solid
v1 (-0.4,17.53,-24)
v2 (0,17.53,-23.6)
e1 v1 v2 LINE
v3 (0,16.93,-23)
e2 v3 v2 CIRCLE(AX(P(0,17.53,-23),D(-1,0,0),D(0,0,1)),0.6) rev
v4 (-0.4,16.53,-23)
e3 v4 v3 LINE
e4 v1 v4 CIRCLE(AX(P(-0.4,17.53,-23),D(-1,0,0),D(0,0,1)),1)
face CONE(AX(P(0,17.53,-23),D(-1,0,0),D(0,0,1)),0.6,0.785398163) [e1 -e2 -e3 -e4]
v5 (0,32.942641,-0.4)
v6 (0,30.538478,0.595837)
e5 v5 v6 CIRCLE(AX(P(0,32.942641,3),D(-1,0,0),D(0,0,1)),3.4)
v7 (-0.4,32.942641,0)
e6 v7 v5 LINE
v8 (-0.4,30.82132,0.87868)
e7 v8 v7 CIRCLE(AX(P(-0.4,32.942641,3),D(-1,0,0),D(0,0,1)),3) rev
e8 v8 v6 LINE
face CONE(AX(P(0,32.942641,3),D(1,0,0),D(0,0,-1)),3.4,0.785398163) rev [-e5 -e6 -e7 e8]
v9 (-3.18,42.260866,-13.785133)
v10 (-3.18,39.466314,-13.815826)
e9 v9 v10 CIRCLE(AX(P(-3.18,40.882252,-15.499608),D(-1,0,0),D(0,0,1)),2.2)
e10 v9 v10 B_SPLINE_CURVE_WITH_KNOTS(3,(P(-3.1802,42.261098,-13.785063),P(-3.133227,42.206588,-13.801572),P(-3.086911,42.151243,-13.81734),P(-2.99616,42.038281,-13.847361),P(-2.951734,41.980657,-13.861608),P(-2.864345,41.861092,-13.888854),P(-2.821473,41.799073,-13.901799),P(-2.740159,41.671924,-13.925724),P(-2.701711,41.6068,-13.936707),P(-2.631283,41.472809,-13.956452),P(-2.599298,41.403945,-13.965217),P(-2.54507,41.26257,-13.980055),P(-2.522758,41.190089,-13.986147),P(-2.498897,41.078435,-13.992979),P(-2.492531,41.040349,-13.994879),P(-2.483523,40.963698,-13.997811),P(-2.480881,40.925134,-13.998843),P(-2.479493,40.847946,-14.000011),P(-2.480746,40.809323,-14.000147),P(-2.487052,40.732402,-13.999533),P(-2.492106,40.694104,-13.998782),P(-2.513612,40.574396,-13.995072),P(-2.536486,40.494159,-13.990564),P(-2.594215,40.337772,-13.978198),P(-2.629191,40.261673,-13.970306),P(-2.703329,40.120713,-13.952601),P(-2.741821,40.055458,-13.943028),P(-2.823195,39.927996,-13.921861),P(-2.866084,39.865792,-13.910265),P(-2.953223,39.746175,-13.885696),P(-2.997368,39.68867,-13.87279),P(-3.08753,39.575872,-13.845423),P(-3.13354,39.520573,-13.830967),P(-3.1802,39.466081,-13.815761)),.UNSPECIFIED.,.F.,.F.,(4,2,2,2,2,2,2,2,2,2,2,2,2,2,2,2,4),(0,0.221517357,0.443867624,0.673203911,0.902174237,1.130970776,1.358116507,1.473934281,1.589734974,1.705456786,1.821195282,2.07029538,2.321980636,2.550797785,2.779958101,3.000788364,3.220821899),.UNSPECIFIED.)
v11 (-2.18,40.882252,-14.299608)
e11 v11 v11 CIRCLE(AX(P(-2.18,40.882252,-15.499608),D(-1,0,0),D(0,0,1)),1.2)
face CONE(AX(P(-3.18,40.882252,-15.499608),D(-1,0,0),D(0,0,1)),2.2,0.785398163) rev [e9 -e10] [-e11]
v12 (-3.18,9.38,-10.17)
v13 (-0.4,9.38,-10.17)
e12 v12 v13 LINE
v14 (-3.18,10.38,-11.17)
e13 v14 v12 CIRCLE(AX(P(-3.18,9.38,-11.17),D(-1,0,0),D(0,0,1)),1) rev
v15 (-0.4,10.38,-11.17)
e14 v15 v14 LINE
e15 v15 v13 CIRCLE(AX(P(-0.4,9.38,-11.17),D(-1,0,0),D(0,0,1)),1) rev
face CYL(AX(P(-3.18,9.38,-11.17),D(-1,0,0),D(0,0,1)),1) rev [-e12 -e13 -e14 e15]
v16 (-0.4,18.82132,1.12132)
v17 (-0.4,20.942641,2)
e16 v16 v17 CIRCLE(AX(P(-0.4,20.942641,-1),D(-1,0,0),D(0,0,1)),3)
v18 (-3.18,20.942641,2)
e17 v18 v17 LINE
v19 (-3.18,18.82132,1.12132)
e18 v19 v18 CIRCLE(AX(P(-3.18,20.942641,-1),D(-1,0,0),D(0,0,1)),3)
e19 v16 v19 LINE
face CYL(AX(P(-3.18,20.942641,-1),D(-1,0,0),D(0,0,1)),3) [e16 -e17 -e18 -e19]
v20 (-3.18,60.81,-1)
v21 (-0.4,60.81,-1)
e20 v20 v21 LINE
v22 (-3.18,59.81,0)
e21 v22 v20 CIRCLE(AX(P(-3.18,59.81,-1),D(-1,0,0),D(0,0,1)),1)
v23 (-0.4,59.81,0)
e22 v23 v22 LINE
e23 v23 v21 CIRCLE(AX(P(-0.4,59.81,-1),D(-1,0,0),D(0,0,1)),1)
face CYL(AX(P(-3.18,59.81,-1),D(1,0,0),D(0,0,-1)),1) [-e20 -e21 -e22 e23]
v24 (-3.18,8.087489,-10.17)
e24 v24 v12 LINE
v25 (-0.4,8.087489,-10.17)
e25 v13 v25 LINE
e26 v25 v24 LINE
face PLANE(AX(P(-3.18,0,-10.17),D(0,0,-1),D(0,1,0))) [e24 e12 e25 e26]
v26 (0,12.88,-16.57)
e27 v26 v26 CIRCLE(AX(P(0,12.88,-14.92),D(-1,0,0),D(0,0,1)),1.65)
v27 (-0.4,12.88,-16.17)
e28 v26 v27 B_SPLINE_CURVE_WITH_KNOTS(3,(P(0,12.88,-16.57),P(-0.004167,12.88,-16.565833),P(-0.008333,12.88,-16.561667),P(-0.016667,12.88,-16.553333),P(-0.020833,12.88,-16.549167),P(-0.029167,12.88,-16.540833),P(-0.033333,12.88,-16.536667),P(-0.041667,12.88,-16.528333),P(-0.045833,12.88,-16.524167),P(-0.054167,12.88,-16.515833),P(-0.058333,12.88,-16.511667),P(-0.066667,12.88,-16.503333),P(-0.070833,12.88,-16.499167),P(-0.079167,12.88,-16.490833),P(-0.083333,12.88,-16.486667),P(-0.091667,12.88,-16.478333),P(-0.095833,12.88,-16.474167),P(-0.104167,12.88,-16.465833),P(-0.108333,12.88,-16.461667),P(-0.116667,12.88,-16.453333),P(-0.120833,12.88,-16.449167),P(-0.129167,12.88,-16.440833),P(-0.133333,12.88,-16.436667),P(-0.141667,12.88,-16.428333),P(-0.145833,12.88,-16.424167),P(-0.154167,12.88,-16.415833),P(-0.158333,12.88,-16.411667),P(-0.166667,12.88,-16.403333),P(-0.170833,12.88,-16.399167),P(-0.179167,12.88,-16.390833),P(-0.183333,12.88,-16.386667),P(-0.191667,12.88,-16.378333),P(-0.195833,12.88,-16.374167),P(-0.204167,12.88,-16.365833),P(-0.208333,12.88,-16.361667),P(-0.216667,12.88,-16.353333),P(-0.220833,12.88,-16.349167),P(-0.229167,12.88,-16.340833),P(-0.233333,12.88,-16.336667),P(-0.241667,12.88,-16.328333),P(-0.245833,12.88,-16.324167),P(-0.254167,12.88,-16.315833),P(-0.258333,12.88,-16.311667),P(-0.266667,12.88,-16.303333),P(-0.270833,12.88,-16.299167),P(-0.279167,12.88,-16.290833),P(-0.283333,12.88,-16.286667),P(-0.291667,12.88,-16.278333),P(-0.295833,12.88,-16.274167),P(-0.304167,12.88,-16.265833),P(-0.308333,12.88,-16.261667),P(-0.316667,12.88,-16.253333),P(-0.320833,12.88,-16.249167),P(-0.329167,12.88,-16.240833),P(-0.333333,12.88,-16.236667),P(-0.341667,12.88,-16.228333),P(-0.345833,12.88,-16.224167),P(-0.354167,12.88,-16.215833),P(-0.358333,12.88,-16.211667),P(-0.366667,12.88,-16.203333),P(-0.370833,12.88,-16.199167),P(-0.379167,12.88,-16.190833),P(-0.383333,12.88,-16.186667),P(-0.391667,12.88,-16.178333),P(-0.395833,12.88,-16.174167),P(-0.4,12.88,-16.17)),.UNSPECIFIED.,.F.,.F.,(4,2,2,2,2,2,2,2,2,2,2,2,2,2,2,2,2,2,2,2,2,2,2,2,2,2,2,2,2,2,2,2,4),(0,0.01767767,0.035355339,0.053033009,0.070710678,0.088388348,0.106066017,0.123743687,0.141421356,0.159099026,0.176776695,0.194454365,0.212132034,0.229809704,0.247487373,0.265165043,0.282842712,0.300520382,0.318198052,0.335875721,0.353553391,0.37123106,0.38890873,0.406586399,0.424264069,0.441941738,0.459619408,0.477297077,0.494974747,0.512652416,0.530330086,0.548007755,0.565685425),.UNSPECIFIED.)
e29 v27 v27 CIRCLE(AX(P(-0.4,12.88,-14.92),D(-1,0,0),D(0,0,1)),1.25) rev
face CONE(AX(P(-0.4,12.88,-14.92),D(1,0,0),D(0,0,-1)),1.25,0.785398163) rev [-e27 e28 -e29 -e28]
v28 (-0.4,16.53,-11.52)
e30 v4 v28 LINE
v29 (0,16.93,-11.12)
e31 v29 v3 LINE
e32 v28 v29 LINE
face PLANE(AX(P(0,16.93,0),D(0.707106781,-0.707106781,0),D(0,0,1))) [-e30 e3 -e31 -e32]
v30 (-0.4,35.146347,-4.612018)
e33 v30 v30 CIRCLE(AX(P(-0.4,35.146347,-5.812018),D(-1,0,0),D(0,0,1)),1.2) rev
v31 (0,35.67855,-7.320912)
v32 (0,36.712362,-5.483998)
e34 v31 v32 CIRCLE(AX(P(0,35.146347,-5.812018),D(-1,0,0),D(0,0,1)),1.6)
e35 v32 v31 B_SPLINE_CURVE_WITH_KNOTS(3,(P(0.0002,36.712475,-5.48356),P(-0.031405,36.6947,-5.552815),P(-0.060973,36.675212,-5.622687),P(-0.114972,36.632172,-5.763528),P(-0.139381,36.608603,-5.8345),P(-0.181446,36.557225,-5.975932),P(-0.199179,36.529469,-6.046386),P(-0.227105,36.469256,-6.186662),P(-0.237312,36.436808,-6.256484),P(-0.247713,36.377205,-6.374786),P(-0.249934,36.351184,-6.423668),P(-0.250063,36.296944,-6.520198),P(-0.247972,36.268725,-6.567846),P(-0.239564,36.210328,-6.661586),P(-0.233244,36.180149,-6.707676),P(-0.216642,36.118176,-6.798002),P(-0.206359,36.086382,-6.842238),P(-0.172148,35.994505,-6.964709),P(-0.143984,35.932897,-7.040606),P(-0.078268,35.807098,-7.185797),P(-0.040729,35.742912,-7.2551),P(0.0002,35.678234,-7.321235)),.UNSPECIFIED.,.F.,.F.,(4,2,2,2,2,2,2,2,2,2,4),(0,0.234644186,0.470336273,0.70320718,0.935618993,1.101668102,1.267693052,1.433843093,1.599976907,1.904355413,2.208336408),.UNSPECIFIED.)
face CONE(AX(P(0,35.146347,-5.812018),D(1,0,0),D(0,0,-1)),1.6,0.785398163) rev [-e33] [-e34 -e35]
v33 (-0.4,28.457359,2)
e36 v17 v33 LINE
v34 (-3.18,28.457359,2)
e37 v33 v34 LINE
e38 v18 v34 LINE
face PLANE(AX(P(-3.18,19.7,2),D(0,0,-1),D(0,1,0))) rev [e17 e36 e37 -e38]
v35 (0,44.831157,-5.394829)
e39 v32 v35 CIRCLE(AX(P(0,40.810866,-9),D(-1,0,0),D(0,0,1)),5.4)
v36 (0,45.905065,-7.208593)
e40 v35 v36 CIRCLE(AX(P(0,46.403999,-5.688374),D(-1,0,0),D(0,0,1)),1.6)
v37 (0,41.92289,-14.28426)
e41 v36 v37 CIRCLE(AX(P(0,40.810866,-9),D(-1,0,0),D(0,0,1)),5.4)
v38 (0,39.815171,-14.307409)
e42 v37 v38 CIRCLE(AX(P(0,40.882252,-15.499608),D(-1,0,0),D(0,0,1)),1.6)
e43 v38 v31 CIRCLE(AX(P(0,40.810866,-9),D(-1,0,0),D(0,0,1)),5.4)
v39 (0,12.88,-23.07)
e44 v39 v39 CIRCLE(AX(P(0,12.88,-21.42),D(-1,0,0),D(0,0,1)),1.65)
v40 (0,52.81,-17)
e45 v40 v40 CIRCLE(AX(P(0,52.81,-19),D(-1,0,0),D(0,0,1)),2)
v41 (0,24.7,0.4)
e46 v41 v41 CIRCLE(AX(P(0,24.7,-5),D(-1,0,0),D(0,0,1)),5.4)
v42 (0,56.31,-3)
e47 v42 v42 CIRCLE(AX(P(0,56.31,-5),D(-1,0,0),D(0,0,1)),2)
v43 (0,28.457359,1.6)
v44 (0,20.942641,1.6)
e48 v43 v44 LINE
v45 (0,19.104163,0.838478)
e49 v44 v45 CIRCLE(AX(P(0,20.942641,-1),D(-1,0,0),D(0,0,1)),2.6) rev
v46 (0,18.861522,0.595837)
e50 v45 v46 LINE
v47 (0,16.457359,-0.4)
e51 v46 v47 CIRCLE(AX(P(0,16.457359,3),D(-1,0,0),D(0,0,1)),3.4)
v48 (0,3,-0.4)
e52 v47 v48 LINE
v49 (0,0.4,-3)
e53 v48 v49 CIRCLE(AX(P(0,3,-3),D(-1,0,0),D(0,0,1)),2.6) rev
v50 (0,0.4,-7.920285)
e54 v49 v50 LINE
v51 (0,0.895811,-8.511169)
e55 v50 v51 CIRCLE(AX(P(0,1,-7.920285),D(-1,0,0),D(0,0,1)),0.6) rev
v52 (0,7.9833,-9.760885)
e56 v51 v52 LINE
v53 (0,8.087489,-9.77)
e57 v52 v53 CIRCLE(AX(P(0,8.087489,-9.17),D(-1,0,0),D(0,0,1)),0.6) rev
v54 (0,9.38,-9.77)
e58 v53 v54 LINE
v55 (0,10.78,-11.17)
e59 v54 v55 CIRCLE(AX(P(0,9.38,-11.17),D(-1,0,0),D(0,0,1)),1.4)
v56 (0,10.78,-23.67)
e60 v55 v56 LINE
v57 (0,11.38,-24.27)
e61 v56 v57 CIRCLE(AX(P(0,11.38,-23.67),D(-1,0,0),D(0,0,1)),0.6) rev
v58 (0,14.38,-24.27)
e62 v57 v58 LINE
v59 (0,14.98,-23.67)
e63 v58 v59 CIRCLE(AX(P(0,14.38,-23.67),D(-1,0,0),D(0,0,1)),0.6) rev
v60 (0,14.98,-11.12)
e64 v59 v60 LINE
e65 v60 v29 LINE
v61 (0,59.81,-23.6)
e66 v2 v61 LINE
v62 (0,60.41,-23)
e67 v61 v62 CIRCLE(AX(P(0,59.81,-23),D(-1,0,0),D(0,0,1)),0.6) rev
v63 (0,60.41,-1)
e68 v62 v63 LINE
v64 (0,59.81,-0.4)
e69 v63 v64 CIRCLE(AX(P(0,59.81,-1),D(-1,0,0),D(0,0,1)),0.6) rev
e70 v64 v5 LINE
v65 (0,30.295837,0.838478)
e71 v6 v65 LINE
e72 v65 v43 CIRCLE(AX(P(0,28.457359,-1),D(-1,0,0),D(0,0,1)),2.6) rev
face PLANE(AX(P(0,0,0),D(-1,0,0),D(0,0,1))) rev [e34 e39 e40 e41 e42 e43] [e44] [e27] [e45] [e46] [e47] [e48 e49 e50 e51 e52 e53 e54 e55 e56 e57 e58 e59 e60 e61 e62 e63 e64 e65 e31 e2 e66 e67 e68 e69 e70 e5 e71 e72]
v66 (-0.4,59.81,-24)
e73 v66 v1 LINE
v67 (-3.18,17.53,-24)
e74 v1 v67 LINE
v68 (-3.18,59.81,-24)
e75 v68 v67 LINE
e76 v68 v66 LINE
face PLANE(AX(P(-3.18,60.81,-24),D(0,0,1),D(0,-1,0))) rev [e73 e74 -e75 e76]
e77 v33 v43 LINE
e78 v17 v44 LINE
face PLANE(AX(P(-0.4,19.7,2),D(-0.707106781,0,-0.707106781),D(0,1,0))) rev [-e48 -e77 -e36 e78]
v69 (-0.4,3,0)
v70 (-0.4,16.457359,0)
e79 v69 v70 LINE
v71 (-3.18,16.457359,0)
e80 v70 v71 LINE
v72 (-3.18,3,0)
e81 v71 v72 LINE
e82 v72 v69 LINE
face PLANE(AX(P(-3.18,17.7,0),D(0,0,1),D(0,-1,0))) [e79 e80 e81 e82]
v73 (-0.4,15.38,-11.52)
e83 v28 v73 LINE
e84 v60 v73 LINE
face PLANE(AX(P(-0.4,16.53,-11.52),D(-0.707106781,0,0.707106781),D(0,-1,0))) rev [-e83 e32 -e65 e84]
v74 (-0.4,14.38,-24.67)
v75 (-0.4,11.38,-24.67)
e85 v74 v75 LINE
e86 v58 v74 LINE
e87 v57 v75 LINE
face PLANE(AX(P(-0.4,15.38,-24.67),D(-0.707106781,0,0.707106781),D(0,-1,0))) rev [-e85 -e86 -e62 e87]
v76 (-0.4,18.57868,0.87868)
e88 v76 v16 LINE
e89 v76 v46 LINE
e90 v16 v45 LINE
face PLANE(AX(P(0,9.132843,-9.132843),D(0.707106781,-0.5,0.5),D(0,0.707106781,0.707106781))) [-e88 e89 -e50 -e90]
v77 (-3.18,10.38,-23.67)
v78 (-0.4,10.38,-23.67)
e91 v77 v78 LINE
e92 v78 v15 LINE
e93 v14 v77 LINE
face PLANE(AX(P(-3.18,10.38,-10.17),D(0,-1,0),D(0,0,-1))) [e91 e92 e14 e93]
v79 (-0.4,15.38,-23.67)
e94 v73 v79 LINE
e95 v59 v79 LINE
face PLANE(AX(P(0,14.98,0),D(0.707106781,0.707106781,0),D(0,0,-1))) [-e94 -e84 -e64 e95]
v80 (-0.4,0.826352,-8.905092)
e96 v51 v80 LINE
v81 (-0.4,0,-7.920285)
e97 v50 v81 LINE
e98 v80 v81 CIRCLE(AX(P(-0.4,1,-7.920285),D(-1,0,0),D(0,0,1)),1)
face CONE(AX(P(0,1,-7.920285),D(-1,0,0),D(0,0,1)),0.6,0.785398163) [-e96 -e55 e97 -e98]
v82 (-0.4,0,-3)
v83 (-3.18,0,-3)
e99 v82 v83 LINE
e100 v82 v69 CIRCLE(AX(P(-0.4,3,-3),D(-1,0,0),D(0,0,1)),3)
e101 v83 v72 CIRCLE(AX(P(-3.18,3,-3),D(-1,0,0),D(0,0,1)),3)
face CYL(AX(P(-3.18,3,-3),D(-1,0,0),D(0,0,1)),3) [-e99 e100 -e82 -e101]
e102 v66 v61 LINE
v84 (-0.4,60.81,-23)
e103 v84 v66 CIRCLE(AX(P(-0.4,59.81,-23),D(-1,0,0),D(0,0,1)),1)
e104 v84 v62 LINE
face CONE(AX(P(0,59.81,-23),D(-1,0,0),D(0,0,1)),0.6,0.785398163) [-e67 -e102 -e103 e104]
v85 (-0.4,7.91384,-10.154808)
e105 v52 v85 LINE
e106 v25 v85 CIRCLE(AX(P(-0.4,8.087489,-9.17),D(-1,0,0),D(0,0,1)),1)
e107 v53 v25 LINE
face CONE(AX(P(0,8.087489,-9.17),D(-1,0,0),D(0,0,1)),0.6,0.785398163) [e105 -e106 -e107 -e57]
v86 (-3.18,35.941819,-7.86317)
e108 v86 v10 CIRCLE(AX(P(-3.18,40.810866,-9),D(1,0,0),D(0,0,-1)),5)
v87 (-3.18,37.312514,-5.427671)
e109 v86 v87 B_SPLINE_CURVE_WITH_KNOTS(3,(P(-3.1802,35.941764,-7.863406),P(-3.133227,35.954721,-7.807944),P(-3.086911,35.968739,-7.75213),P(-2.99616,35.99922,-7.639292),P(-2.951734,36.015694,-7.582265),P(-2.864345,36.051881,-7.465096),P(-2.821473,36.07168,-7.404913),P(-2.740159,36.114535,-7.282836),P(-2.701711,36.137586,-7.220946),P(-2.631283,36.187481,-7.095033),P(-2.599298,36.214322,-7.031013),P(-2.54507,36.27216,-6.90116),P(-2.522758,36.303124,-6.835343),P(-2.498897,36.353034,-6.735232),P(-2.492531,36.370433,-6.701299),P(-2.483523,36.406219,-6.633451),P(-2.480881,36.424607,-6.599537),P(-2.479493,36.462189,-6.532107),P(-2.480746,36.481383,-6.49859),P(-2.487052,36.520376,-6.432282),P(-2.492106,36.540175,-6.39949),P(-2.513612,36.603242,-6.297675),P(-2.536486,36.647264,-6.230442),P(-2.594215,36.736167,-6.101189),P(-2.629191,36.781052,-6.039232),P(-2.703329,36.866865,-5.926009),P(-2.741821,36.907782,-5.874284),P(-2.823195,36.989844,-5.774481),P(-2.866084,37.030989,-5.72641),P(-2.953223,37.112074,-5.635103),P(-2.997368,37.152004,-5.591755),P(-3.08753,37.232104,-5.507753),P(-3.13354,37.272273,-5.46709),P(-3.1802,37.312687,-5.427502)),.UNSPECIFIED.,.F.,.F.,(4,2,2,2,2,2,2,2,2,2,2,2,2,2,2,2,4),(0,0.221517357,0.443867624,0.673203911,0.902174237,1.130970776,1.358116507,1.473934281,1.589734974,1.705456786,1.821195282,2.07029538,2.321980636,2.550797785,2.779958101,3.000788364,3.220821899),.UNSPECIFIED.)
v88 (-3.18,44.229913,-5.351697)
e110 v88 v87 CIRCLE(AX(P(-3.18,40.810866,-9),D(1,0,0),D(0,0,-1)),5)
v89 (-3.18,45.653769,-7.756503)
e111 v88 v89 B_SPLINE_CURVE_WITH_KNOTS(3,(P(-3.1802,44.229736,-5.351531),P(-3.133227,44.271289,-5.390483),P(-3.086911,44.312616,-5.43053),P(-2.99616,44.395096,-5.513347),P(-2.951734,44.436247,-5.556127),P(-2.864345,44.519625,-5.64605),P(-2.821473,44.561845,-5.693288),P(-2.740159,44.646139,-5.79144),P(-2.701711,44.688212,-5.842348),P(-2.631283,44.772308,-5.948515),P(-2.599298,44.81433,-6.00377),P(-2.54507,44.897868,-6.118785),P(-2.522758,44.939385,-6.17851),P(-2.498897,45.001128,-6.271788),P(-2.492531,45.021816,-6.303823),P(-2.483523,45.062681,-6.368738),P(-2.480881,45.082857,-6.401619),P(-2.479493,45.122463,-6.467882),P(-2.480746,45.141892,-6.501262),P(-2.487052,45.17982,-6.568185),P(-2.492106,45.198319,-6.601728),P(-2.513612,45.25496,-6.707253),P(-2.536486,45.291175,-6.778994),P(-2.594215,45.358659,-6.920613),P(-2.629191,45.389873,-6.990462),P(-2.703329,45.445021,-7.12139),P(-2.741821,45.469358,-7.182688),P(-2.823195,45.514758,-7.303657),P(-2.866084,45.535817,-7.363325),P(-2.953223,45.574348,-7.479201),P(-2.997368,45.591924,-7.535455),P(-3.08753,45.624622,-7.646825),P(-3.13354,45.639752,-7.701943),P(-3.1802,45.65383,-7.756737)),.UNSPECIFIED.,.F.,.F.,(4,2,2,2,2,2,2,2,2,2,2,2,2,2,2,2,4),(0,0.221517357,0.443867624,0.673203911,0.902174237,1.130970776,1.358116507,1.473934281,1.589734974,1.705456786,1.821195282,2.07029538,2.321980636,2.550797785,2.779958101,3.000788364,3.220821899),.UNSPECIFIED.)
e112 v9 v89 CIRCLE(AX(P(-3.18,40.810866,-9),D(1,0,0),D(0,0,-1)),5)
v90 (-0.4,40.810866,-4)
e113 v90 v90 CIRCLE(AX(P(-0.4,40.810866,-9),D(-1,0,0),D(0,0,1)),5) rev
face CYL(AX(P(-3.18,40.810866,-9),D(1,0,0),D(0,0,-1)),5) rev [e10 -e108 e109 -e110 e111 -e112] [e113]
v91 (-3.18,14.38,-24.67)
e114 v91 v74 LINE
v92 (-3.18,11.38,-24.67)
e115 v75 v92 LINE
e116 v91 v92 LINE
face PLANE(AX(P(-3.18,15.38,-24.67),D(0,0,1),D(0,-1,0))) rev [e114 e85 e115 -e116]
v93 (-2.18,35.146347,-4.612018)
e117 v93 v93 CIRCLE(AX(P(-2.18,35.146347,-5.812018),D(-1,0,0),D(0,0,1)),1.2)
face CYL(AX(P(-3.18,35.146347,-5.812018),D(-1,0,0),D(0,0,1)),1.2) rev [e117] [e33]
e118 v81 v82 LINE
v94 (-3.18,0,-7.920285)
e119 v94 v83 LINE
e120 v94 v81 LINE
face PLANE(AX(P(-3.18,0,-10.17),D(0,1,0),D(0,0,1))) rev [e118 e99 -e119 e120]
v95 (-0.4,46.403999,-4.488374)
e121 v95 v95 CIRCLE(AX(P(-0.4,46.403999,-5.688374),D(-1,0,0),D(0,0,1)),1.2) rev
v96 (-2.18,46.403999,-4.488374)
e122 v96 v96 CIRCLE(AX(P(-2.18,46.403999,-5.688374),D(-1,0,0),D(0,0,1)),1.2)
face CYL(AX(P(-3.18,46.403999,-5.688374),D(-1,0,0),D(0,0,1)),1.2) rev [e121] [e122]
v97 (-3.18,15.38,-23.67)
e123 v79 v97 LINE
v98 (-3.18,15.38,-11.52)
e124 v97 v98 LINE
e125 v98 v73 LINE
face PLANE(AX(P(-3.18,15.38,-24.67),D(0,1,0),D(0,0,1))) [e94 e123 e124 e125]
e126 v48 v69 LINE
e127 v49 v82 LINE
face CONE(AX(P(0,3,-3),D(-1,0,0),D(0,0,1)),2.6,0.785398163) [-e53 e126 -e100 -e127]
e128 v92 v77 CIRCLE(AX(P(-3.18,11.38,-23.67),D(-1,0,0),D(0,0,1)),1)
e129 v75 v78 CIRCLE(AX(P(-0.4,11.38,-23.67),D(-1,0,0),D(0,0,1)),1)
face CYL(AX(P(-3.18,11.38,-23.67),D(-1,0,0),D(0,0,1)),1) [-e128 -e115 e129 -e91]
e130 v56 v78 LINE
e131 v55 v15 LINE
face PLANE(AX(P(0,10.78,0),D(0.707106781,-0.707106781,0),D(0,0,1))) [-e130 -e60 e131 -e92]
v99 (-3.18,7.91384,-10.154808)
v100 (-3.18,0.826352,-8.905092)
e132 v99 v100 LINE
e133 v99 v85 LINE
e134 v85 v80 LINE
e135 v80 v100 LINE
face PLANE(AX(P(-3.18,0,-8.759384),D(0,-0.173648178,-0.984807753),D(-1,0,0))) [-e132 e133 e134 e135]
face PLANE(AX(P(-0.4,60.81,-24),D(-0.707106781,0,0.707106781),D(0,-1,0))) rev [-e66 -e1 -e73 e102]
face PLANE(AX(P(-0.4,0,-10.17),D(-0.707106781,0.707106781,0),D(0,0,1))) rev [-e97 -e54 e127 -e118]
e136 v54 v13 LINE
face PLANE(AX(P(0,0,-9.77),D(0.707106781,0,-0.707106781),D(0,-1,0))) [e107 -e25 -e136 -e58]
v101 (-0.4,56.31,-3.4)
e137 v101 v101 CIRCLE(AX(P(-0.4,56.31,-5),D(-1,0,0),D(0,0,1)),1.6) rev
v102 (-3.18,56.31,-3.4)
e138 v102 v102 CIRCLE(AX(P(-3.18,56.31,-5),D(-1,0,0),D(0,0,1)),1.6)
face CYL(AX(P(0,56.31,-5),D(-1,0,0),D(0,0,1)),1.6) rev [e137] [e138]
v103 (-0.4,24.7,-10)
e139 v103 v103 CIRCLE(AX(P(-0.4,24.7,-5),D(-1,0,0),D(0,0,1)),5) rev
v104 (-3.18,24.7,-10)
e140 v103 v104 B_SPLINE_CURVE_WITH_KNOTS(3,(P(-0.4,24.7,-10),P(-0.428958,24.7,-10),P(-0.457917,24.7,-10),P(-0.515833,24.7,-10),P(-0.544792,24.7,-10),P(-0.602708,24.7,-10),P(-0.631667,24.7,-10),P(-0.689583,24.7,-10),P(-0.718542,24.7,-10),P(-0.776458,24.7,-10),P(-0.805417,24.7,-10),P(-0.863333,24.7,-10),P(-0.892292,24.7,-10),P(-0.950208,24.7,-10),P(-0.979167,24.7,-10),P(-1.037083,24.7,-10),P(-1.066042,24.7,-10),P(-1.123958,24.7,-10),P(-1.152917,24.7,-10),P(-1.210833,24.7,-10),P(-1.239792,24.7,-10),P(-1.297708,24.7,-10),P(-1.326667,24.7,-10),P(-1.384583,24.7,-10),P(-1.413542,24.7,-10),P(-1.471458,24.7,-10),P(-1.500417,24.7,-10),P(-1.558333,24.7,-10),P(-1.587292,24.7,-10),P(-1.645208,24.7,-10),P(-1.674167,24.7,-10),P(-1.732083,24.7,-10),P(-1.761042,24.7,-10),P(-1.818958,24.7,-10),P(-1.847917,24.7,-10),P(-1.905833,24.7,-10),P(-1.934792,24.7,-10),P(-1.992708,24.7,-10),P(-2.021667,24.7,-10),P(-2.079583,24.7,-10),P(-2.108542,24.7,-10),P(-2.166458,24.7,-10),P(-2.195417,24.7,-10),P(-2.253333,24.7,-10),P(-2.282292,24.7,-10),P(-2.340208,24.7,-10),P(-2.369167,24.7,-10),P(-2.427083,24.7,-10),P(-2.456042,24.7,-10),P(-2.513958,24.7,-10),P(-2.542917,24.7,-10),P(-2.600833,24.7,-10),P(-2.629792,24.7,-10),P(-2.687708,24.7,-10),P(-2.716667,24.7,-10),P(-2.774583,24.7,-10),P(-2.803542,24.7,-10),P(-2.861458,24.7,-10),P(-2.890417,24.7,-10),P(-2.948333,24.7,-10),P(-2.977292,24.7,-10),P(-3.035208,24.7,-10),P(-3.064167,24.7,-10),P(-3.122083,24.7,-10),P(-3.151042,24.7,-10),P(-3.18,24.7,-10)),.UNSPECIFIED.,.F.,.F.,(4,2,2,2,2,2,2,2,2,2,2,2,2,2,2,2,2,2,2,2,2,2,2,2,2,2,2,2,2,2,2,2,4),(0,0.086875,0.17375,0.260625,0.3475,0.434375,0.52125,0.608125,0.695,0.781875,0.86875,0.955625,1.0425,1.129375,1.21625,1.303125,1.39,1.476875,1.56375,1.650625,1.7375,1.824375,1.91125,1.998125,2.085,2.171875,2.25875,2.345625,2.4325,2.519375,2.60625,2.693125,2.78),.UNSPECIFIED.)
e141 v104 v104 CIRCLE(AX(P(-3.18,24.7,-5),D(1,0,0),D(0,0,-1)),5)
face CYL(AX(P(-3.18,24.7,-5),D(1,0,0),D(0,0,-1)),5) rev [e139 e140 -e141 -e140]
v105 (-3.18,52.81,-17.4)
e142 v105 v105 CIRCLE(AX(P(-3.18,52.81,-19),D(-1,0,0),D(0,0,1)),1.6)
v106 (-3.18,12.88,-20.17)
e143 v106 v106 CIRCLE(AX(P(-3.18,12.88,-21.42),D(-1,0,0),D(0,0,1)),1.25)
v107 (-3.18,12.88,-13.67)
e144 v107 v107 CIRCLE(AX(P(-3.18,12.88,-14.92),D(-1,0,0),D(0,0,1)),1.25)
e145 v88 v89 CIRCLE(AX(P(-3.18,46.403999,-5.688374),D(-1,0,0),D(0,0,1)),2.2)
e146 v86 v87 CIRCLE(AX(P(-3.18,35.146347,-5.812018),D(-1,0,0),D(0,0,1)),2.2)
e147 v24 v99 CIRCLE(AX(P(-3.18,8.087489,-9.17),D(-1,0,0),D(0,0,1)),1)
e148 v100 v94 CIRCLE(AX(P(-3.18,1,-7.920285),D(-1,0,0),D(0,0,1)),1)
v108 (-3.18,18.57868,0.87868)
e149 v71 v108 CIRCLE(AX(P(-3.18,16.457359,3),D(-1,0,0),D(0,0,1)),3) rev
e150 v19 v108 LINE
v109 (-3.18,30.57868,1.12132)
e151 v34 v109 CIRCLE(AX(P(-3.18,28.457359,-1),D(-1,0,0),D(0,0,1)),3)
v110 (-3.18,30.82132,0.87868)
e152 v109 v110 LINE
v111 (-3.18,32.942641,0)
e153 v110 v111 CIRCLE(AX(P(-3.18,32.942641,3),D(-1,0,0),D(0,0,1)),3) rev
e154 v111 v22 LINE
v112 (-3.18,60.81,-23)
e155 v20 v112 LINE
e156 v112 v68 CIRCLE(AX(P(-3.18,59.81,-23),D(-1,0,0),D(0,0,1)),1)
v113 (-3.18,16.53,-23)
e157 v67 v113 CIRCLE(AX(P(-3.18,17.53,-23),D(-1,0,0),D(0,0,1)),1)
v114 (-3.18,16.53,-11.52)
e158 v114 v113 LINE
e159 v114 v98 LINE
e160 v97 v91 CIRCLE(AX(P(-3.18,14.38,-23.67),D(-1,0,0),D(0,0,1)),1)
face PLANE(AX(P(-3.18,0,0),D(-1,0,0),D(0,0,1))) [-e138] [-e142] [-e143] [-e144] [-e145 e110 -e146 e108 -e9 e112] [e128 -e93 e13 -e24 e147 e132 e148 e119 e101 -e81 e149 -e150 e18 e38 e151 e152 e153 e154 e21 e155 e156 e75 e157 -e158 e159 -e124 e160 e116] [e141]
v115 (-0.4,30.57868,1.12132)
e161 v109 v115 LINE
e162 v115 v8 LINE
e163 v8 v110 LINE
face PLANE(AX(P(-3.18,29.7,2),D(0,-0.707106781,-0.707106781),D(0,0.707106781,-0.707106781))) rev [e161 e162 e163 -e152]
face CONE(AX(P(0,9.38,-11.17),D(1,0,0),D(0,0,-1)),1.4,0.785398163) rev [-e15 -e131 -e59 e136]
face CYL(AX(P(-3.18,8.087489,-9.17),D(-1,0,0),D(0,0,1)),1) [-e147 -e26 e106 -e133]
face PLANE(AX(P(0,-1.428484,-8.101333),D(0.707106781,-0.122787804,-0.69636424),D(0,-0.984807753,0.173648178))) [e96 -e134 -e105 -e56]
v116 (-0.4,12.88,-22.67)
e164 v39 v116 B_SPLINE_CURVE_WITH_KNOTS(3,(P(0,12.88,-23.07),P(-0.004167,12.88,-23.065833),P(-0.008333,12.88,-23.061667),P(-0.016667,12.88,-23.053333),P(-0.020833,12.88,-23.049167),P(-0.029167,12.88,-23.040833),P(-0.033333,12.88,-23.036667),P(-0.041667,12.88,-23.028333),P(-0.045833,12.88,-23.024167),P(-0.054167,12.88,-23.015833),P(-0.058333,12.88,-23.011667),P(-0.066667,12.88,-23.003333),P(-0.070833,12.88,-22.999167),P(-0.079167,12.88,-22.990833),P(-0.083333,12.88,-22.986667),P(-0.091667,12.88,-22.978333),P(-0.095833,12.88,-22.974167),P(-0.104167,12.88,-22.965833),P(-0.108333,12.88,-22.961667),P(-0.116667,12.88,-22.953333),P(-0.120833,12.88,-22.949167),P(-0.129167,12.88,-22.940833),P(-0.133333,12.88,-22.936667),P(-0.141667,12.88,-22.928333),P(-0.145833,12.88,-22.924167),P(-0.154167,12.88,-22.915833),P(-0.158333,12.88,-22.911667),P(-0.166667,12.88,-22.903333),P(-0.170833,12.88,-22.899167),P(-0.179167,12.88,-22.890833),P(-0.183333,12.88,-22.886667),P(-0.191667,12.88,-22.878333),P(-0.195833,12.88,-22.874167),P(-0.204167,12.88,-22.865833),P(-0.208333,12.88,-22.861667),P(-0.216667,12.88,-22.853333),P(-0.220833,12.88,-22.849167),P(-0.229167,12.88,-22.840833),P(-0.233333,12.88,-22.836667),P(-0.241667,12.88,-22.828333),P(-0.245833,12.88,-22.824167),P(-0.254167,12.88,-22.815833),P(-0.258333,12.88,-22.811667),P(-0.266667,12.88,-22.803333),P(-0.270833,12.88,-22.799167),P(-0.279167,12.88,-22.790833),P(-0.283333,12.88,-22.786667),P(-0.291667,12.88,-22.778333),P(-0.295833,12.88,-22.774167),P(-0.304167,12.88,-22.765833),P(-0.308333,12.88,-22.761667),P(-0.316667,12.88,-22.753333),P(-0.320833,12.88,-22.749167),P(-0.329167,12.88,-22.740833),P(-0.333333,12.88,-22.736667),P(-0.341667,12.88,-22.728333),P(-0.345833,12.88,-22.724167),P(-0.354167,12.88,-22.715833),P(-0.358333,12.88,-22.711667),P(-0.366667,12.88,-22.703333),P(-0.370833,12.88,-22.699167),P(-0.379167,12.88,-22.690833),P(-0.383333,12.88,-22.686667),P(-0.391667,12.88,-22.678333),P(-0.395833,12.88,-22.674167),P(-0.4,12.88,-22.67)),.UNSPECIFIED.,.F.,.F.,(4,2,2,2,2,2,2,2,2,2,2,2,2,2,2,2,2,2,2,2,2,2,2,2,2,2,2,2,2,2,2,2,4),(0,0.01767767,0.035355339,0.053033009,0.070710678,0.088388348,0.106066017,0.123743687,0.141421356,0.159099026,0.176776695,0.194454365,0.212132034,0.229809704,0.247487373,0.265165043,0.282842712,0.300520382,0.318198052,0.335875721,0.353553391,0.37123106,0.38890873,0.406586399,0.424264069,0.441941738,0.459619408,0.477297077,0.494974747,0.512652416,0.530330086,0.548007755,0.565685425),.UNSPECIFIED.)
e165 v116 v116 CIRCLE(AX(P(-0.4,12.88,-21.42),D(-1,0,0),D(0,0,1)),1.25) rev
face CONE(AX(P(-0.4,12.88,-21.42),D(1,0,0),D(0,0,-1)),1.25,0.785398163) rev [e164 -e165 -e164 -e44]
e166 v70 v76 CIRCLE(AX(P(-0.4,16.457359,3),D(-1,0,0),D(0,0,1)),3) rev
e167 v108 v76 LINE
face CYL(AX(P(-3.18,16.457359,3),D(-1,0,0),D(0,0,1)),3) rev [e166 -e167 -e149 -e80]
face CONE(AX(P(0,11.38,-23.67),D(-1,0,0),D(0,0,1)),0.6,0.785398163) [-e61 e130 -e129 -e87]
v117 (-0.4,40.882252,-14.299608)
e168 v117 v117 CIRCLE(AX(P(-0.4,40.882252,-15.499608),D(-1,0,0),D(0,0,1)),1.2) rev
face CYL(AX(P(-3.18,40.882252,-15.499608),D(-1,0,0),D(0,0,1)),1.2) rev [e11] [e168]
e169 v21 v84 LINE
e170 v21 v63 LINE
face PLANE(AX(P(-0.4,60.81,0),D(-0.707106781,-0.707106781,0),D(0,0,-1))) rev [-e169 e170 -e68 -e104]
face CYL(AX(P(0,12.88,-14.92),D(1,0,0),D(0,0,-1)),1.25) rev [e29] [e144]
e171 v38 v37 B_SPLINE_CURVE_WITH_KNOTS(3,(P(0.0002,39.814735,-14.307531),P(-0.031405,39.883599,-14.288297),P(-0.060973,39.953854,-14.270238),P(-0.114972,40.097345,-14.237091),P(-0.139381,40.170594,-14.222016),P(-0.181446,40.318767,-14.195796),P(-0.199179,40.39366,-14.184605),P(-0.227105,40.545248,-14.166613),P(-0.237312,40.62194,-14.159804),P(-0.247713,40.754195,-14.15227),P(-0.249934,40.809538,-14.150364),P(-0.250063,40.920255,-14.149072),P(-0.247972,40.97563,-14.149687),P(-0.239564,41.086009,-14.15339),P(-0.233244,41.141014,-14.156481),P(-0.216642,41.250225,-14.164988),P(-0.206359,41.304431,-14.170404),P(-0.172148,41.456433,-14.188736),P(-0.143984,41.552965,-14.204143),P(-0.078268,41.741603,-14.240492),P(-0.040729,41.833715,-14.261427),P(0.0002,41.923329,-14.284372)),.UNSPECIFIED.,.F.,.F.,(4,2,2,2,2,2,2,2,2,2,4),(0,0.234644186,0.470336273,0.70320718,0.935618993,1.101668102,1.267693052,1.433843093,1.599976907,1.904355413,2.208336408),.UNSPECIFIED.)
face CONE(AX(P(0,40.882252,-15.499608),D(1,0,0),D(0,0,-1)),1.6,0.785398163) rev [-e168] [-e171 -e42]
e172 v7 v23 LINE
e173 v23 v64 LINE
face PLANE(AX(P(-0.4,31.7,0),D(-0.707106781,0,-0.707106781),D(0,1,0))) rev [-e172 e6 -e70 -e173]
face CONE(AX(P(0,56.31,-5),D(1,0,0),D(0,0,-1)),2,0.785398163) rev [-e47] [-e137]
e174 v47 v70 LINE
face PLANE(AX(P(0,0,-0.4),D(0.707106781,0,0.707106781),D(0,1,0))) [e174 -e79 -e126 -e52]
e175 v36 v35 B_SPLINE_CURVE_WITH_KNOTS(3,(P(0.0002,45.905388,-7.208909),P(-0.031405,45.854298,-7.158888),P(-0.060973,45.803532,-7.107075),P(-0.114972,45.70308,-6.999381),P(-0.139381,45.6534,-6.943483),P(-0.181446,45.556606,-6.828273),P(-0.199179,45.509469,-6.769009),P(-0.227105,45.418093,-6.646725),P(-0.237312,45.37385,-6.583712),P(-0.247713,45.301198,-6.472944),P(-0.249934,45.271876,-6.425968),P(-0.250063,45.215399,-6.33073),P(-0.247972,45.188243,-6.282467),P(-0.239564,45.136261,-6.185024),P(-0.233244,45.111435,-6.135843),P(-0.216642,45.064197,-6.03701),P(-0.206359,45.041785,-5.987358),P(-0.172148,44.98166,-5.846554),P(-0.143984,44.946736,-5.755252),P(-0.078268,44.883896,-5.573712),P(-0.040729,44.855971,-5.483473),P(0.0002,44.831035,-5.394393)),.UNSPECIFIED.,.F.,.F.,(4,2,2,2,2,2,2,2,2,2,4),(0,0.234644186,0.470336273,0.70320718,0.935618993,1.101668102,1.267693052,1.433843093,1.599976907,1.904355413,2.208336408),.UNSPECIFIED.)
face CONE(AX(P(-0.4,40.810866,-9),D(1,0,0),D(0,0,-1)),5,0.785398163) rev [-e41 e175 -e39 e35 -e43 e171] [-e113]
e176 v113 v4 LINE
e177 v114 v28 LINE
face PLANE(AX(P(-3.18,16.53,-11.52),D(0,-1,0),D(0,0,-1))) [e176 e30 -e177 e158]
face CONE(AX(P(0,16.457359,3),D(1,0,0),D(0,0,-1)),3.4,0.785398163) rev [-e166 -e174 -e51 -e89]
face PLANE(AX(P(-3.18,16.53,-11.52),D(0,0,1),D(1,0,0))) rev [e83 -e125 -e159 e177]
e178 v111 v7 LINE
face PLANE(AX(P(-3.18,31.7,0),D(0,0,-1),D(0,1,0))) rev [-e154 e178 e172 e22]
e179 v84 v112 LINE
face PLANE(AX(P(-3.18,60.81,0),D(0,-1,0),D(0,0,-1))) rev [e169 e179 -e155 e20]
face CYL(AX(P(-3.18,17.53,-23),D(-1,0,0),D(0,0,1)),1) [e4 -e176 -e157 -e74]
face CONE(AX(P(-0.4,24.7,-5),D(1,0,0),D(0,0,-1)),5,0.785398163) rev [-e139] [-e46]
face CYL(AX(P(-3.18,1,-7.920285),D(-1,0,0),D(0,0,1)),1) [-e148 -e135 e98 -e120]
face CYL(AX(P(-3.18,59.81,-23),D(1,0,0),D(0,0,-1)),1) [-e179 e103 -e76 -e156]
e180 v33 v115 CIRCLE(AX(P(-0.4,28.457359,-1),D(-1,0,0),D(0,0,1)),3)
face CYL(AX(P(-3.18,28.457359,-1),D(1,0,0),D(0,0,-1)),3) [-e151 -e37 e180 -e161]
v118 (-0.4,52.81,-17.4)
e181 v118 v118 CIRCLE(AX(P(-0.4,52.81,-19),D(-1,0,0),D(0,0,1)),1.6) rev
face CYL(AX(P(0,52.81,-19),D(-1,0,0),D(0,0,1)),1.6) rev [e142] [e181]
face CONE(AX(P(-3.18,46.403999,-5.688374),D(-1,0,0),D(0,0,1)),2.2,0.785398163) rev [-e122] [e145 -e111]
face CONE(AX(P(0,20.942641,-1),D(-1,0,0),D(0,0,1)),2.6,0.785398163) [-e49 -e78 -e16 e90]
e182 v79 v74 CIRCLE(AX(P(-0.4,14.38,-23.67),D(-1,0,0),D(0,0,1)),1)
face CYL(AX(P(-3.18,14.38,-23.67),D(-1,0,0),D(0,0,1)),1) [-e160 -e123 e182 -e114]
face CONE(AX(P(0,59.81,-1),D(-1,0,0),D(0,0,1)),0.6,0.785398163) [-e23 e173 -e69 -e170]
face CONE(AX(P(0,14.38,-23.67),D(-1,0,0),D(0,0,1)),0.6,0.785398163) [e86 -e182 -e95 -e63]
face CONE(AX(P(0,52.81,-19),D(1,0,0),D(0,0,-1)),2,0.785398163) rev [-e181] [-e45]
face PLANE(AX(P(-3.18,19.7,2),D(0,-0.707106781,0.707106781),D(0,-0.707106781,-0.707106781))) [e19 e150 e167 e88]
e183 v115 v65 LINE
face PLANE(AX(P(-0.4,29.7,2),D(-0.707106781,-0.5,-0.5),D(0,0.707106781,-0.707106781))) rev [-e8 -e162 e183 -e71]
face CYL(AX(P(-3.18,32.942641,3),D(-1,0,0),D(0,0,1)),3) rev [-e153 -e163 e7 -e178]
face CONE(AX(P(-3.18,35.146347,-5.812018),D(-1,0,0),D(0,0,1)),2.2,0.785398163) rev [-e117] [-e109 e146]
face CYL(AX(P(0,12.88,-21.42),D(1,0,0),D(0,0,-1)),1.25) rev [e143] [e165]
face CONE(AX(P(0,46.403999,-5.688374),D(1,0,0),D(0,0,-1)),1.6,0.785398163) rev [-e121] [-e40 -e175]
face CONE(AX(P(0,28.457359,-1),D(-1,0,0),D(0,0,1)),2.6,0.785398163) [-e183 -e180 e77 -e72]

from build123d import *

# Parameters (mm, degrees)
BOSS_EXTRUDE1_DEPTH                             = 3.18
SKETCH2_4_OUTSIDE_W                             = 41.966
SKETCH2_4_OUTSIDE_H                             = 76.106
SKETCH2_4_OUTSIDE_R                             = 5
CUT_EXTRUDE2_DEPTH                              = 3.18
FILLET6_R                                       = 3
CSK_FOR_M2_FLAT_HEAD_MACHINE_SCREW2_D           = 2.4
CSK_FOR_M2_FLAT_HEAD_MACHINE_SCREW2_CSINK_D     = 4.4
CSK_FOR_M2_FLAT_HEAD_MACHINE_SCREW2_CSINK_ANGLE = 90
M3X0_5_TAPPED_HOLE1_D                           = 2.5
M3X0_5_TAPPED_HOLE1_DEPTH                       = 3.478924226
M3X0_5_TAPPED_HOLE1_TIP                         = 0.751075774
CHAMFER1_SIZE                                   = 8
CHAMFER1_SIZE2                                  = 1.410615846
FILLET7_R                                       = 1
SKETCH16_R                                      = 1.6
CUT_EXTRUDE3_DEPTH                              = 66.700665146
CHAMFER2_SIZE                                   = 0.4


with BuildPart() as part:
    # Sketch2 → Boss-Extrude1 (new body)
    with BuildSketch(Plane(origin=(0, 0, 0), x_dir=(0, 0, -1), z_dir=(1, 0, 0))):
        Polygon((0, 60.81), (24, 60.81), (24, 16.53), (11.52, 16.53), (11.52, 15.38), (24.67, 15.38), (24.67, 10.38), (10.17, 10.38), (10.17, 0), (0, 0), (0, 17.7), (-2, 19.7), (-2, 29.7), (0, 31.7), align=None)
    extrude(amount=-BOSS_EXTRUDE1_DEPTH)

    # Sketch2<4> outside → Cut-Extrude2 (cut)
    # profile 1 of 3: a face of its own
    with BuildSketch(Plane(origin=(0, 0, 0), x_dir=(0, 0, -1), z_dir=(1, 0, 0))):
        with Locations((11.335, 30.405)):
            Rectangle(SKETCH2_4_OUTSIDE_W, SKETCH2_4_OUTSIDE_H)
        Polygon((0, 60.81), (24, 60.81), (24, 16.53), (11.52, 16.53), (11.52, 15.38), (24.67, 15.38), (24.67, 10.38), (10.17, 10.38), (10.17, 0), (0, 0), (0, 17.7), (-2, 19.7), (-2, 29.7), (0, 31.7), align=None, mode=Mode.SUBTRACT)
    # profile 2 of 3: a face of its own
    with BuildSketch(Plane(origin=(0, 0, 0), x_dir=(0, 0, -1), z_dir=(1, 0, 0))):
        with Locations((5, 24.7)):
            Circle(SKETCH2_4_OUTSIDE_R)
    # profile 3 of 3: a face of its own
    with BuildSketch(Plane(origin=(0, 0, 0), x_dir=(0, 0, -1), z_dir=(1, 0, 0))):
        with Locations((9, 40.810865899)):
            Circle(SKETCH2_4_OUTSIDE_R)
    extrude(amount=-CUT_EXTRUDE2_DEPTH, mode=Mode.SUBTRACT)

    # Fillet6
    fillet6_edges = [part.edges().sort_by_distance(p)[0] for p in [
        (-1.59, 31.7, 0),
        (-1.59, 29.7, 2),
        (-1.59, 19.7, 2),
        (-1.59, 17.7, 0),
        (-1.59, 0, 0),
    ]]
    fillet(fillet6_edges, radius=FILLET6_R)

    # CSK for M2 Flat Head Machine Screw2 (through all)
    with Locations(Plane.ZY.offset(3.18)):
        with Locations((-5.688374042, 46.403998609), (-15.499607993, 40.882251751), (-5.812017965, 35.146347336)):
            CounterSinkHole(CSK_FOR_M2_FLAT_HEAD_MACHINE_SCREW2_D / 2, CSK_FOR_M2_FLAT_HEAD_MACHINE_SCREW2_CSINK_D / 2, counter_sink_angle=CSK_FOR_M2_FLAT_HEAD_MACHINE_SCREW2_CSINK_ANGLE)

    # M3x0.5 Tapped Hole1
    with Locations(Plane(origin=(0, 0, 0), x_dir=(0, 0, -1), z_dir=(1, 0, 0))):
        with Locations((21.42, 12.88), (14.92, 12.88)):
            Hole(M3X0_5_TAPPED_HOLE1_D / 2, depth=M3X0_5_TAPPED_HOLE1_DEPTH)
            with Locations((0, 0, -(M3X0_5_TAPPED_HOLE1_DEPTH + M3X0_5_TAPPED_HOLE1_TIP / 2))):  # 118° drill point
                Cone(0, M3X0_5_TAPPED_HOLE1_D / 2, M3X0_5_TAPPED_HOLE1_TIP, mode=Mode.SUBTRACT)

    # Chamfer1
    chamfer1_edges = [part.edges().sort_by_distance(p)[0] for p in [
        (-1.59, 0, -10.17),
    ]]
    chamfer1_side = [part.faces().sort_by_distance(p)[0] for p in [
        (-1.59, 5.19, -10.17),
    ]]
    chamfer(chamfer1_edges, length=CHAMFER1_SIZE, length2=CHAMFER1_SIZE2, reference=chamfer1_side[0])

    # Fillet7
    fillet7_edges = [part.edges().sort_by_distance(p)[0] for p in [
        (-1.59, 0, -8.759384154),
        (-1.59, 8, -10.17),
        (-1.59, 10.38, -10.17),
        (-1.59, 10.38, -24.67),
        (-1.59, 15.38, -24.67),
        (-1.59, 16.53, -24),
        (-1.59, 60.81, -24),
        (-1.59, 60.81, 0),
    ]]
    fillet(fillet7_edges, radius=FILLET7_R)

    # Sketch16 → Cut-Extrude3 (cut, through all)
    with BuildSketch(Plane.ZY.offset(3.18)):
        with Locations((-19, 52.81)):
            Circle(SKETCH16_R)
        with Locations((-5, 56.31)):
            Circle(SKETCH16_R)
    extrude(amount=-CUT_EXTRUDE3_DEPTH, mode=Mode.SUBTRACT)

    # Chamfer2
    # the kernel refuses this chamfer: 0.4 mm, written as the material it takes off along each edge
    with BuildSketch(Plane(origin=(0, 32.942640687, 3), x_dir=(0, 0, -1), z_dir=(0, 1, 0))) as chamfer2_piece_1:
        Polygon((3 + CHAMFER2_SIZE, 0), (3, CHAMFER2_SIZE), (3, 0), align=None)
    revolve(axis=Axis((0, 32.942640687, 3), (-1, 0, 0)), revolution_arc=45, mode=Mode.SUBTRACT)
    with BuildSketch(Plane(origin=(0, 35.146347336, -5.812017965), x_dir=(0, 0, -1), z_dir=(0, -1, 0))) as chamfer2_piece_2:
        Polygon((1.2 + CHAMFER2_SIZE, 0), (1.2, -CHAMFER2_SIZE), (1.2, 0), align=None)
    revolve(axis=Axis((0, 35.146347336, -5.812017965), (1, 0, 0)), mode=Mode.SUBTRACT)
    with BuildSketch(Plane(origin=(0, 40.882251751, -15.499607993), x_dir=(0, 0, -1), z_dir=(0, -1, 0))) as chamfer2_piece_3:
        Polygon((1.2 + CHAMFER2_SIZE, 0), (1.2, -CHAMFER2_SIZE), (1.2, 0), align=None)
    revolve(axis=Axis((0, 40.882251751, -15.499607993), (1, 0, 0)), mode=Mode.SUBTRACT)
    with BuildSketch(Plane(origin=(0, 46.403998609, -5.688374042), x_dir=(0, 0, -1), z_dir=(0, -1, 0))) as chamfer2_piece_4:
        Polygon((1.2 + CHAMFER2_SIZE, 0), (1.2, -CHAMFER2_SIZE), (1.2, 0), align=None)
    revolve(axis=Axis((0, 46.403998609, -5.688374042), (1, 0, 0)), mode=Mode.SUBTRACT)
    with BuildSketch(Plane(origin=(0, 12.88, -14.92), x_dir=(0, 0, 1), z_dir=(0, -1, 0))) as chamfer2_piece_5:
        Polygon((1.25 + CHAMFER2_SIZE, 0), (1.25, CHAMFER2_SIZE), (1.25, 0), align=None)
    revolve(axis=Axis((0, 12.88, -14.92), (-1, 0, 0)), mode=Mode.SUBTRACT)
    with BuildSketch(Plane(origin=(0, 12.88, -21.42), x_dir=(0, 0, 1), z_dir=(0, -1, 0))) as chamfer2_piece_6:
        Polygon((1.25 + CHAMFER2_SIZE, 0), (1.25, CHAMFER2_SIZE), (1.25, 0), align=None)
    revolve(axis=Axis((0, 12.88, -21.42), (-1, 0, 0)), mode=Mode.SUBTRACT)
    with BuildSketch(Plane(origin=(0, 0, -7.920284523), x_dir=(0.027495876610586518, 0.9996219169112966, 0), z_dir=(0, 0, 1))) as chamfer2_piece_7:
        Polygon((CHAMFER2_SIZE * 0.999621916911, CHAMFER2_SIZE * 0.0274958766106), (-CHAMFER2_SIZE * 0.0274958766106, CHAMFER2_SIZE * 0.999621916911), (0, 0), align=None)
    extrude(amount=4.920284523, mode=Mode.SUBTRACT)
    with BuildSketch(Plane(origin=(0, 7.913840486, -10.154807753), x_dir=(0.0274958766105864, 0.17358252422757048, 0.9844354138551703), z_dir=(0, -0.9848077530122081, 0.17364817766693047))) as chamfer2_piece_8:
        Polygon((CHAMFER2_SIZE * 0.999621916911, CHAMFER2_SIZE * 0.0274958766106), (-CHAMFER2_SIZE * 0.0274958766106, CHAMFER2_SIZE * 0.999621916911), (0, 0), align=None)
    extrude(amount=7.1968246, mode=Mode.SUBTRACT)
    with BuildSketch(Plane(origin=(0, 9.38, -10.17), x_dir=(0.027495876610586306, 0, 0.9996219169112966), z_dir=(0, -1, 0))) as chamfer2_piece_9:
        Polygon((CHAMFER2_SIZE * 0.999621916911, CHAMFER2_SIZE * 0.0274958766106), (-CHAMFER2_SIZE * 0.0274958766106, CHAMFER2_SIZE * 0.999621916911), (0, 0), align=None)
    extrude(amount=1.292511336, mode=Mode.SUBTRACT)
    with BuildSketch(Plane(origin=(0, 10.38, -23.67), x_dir=(0.027495876610586306, 0.9996219169112966, 0), z_dir=(0, 0, 1))) as chamfer2_piece_10:
        Polygon((CHAMFER2_SIZE * 0.999621916911, CHAMFER2_SIZE * 0.0274958766106), (-CHAMFER2_SIZE * 0.0274958766106, CHAMFER2_SIZE * 0.999621916911), (0, 0), align=None)
    extrude(amount=12.5, mode=Mode.SUBTRACT)
    with BuildSketch(Plane(origin=(0, 14.38, -24.67), x_dir=(0.027495876610586487, 0, 0.9996219169112966), z_dir=(0, -1, 0))) as chamfer2_piece_11:
        Polygon((CHAMFER2_SIZE * 0.999621916911, CHAMFER2_SIZE * 0.0274958766106), (-CHAMFER2_SIZE * 0.0274958766106, CHAMFER2_SIZE * 0.999621916911), (0, 0), align=None)
    extrude(amount=3, mode=Mode.SUBTRACT)
    with BuildSketch(Plane(origin=(0, 15.38, -11.52), x_dir=(0.027495876610586306, -0.9996219169112966, 0), z_dir=(0, 0, -1))) as chamfer2_piece_12:
        Polygon((CHAMFER2_SIZE * 0.999621916911, CHAMFER2_SIZE * 0.0274958766106), (-CHAMFER2_SIZE * 0.0274958766106, CHAMFER2_SIZE * 0.999621916911), (0, 0), align=None)
    extrude(amount=12.15, mode=Mode.SUBTRACT)
    with BuildSketch(Plane(origin=(0, 59.81, -24), x_dir=(0.027495876610586487, 0, 0.9996219169112966), z_dir=(0, -1, 0))) as chamfer2_piece_13:
        Polygon((CHAMFER2_SIZE * 0.999621916911, CHAMFER2_SIZE * 0.0274958766106), (-CHAMFER2_SIZE * 0.0274958766106, CHAMFER2_SIZE * 0.999621916911), (0, 0), align=None)
    extrude(amount=42.28, mode=Mode.SUBTRACT)
    with BuildSketch(Plane(origin=(0, 60.81, -1), x_dir=(0.027495876610586726, -0.9996219169112966, 0), z_dir=(0, 0, -1))) as chamfer2_piece_14:
        Polygon((CHAMFER2_SIZE * 0.999621916911, CHAMFER2_SIZE * 0.0274958766106), (-CHAMFER2_SIZE * 0.0274958766106, CHAMFER2_SIZE * 0.999621916911), (0, 0), align=None)
    extrude(amount=22, mode=Mode.SUBTRACT)
    with BuildSketch(Plane(origin=(0, 16.53, -11.52), x_dir=(0.027495876610586306, 0, 0.9996219169112966), z_dir=(0, -1, 0))) as chamfer2_piece_15:
        Polygon((CHAMFER2_SIZE * 0.999621916911, CHAMFER2_SIZE * 0.0274958766106), (-CHAMFER2_SIZE * 0.0274958766106, CHAMFER2_SIZE * 0.999621916911), (0, 0), align=None)
    extrude(amount=1.15, mode=Mode.SUBTRACT)
    with BuildSketch(Plane(origin=(0, 59.81, -1), x_dir=(0, 1, 0), z_dir=(0, 0, -1))) as chamfer2_piece_16:
        Polygon((1 - CHAMFER2_SIZE, 0), (1, -CHAMFER2_SIZE), (1, 0), align=None)
    revolve(axis=Axis((0, 59.81, -1), (1, 0, 0)), revolution_arc=90, mode=Mode.SUBTRACT)
    with BuildSketch(Plane(origin=(0, 59.81, -23), x_dir=(0, 0, -1), z_dir=(0, -1, 0))) as chamfer2_piece_17:
        Polygon((1 - CHAMFER2_SIZE, 0), (1, -CHAMFER2_SIZE), (1, 0), align=None)
    revolve(axis=Axis((0, 59.81, -23), (1, 0, 0)), revolution_arc=90, mode=Mode.SUBTRACT)
    with BuildSketch(Plane(origin=(0, 1, -7.920284523), x_dir=(0, -0.17364817766693164, -0.9848077530122079), z_dir=(0, 0.9848077530122079, -0.17364817766693164))) as chamfer2_piece_18:
        Polygon((1 - CHAMFER2_SIZE, 0), (1, CHAMFER2_SIZE), (1, 0), align=None)
    revolve(axis=Axis((0, 1, -7.920284523), (-1, 0, 0)), revolution_arc=80, mode=Mode.SUBTRACT)
    with BuildSketch(Plane(origin=(0, 8.087488664, -9.17), x_dir=(0, 0, -1), z_dir=(0, 1, 0))) as chamfer2_piece_19:
        Polygon((1 - CHAMFER2_SIZE, 0), (1, CHAMFER2_SIZE), (1, 0), align=None)
    revolve(axis=Axis((0, 8.087488664, -9.17), (-1, 0, 0)), revolution_arc=10, mode=Mode.SUBTRACT)
    with BuildSketch(Plane(origin=(0, 14.38, -23.67), x_dir=(0, 0, -1), z_dir=(0, -1, 0))) as chamfer2_piece_20:
        Polygon((1 - CHAMFER2_SIZE, 0), (1, -CHAMFER2_SIZE), (1, 0), align=None)
    revolve(axis=Axis((0, 14.38, -23.67), (1, 0, 0)), revolution_arc=90, mode=Mode.SUBTRACT)
    with BuildSketch(Plane(origin=(0, 16.53, -23), x_dir=(0.027495876610586487, 0.9996219169112966, 0), z_dir=(0, 0, 1))) as chamfer2_piece_21:
        Polygon((CHAMFER2_SIZE * 0.999621916911, CHAMFER2_SIZE * 0.0274958766106), (-CHAMFER2_SIZE * 0.0274958766106, CHAMFER2_SIZE * 0.999621916911), (0, 0), align=None)
    extrude(amount=11.48, mode=Mode.SUBTRACT)
    with BuildSketch(Plane(origin=(0, 11.38, -23.67), x_dir=(0, -1, 0), z_dir=(0, 0, 1))) as chamfer2_piece_22:
        Polygon((1 - CHAMFER2_SIZE, 0), (1, -CHAMFER2_SIZE), (1, 0), align=None)
    revolve(axis=Axis((0, 11.38, -23.67), (1, 0, 0)), revolution_arc=90, mode=Mode.SUBTRACT)
    with BuildSketch(Plane(origin=(0, 17.53, -23), x_dir=(0, -1, 0), z_dir=(0, 0, 1))) as chamfer2_piece_23:
        Polygon((1 - CHAMFER2_SIZE, 0), (1, -CHAMFER2_SIZE), (1, 0), align=None)
    revolve(axis=Axis((0, 17.53, -23), (1, 0, 0)), revolution_arc=90, mode=Mode.SUBTRACT)
    with BuildSketch(Plane(origin=(0, 9.38, -11.17), x_dir=(0, 0, 1), z_dir=(0, -1, 0))) as chamfer2_piece_24:
        Polygon((1 + CHAMFER2_SIZE, 0), (1, CHAMFER2_SIZE), (1, 0), align=None)
    revolve(axis=Axis((0, 9.38, -11.17), (-1, 0, 0)), revolution_arc=90, mode=Mode.SUBTRACT)
    with BuildSketch(Plane(origin=(0, 52.81, -19), x_dir=(0, 0, 1), z_dir=(0, -1, 0))) as chamfer2_piece_25:
        Polygon((1.6 + CHAMFER2_SIZE, 0), (1.6, CHAMFER2_SIZE), (1.6, 0), align=None)
    revolve(axis=Axis((0, 52.81, -19), (-1, 0, 0)), mode=Mode.SUBTRACT)
    with BuildSketch(Plane(origin=(0, 56.31, -5), x_dir=(0, 0, 1), z_dir=(0, -1, 0))) as chamfer2_piece_26:
        Polygon((1.6 + CHAMFER2_SIZE, 0), (1.6, CHAMFER2_SIZE), (1.6, 0), align=None)
    revolve(axis=Axis((0, 56.31, -5), (-1, 0, 0)), mode=Mode.SUBTRACT)
    with BuildSketch(Plane(origin=(0, 24.7, -5), x_dir=(0, 0, -1), z_dir=(0, -1, 0))) as chamfer2_piece_27:
        Polygon((5 + CHAMFER2_SIZE, 0), (5, -CHAMFER2_SIZE), (5, 0), align=None)
    revolve(axis=Axis((0, 24.7, -5), (1, 0, 0)), mode=Mode.SUBTRACT)
    with BuildSketch(Plane(origin=(0, 40.810865899, -9), x_dir=(0, 0, -1), z_dir=(0, -1, 0))) as chamfer2_piece_28:
        Polygon((5 + CHAMFER2_SIZE, 0), (5, -CHAMFER2_SIZE), (5, 0), align=None)
    revolve(axis=Axis((0, 40.810865899, -9), (1, 0, 0)), mode=Mode.SUBTRACT)
    with BuildSketch(Plane(origin=(0, 3, 0), x_dir=(0.02749587661058638, 0, -0.9996219169112966), z_dir=(0, 1, 0))) as chamfer2_piece_29:
        Polygon((CHAMFER2_SIZE * 0.999621916911, CHAMFER2_SIZE * 0.0274958766106), (-CHAMFER2_SIZE * 0.0274958766106, CHAMFER2_SIZE * 0.999621916911), (0, 0), align=None)
    extrude(amount=13.457359313, mode=Mode.SUBTRACT)
    with BuildSketch(Plane(origin=(0, 32.942640687, 0), x_dir=(0.027495876610586317, 0, -0.9996219169112966), z_dir=(0, 1, 0))) as chamfer2_piece_30:
        Polygon((CHAMFER2_SIZE * 0.999621916911, CHAMFER2_SIZE * 0.0274958766106), (-CHAMFER2_SIZE * 0.0274958766106, CHAMFER2_SIZE * 0.999621916911), (0, 0), align=None)
    extrude(amount=26.867359313, mode=Mode.SUBTRACT)
    with BuildSketch(Plane(origin=(0, 30.578679656, 1.121320344), x_dir=(0.02749587661058647, -0.7068394360706819, -0.7068394360706651), z_dir=(0, 0.7071067811865392, -0.7071067811865559)), Plane(origin=(0, 18.578679656, 0.878679656), x_dir=(0.027495876610586507, 0.706839436070683, -0.7068394360706641), z_dir=(0, 0.7071067811865381, 0.707106781186557))) as chamfer2_piece_31:
        Polygon((CHAMFER2_SIZE * 0.999621916911, CHAMFER2_SIZE * 0.0274958766106), (-CHAMFER2_SIZE * 0.0274958766106, CHAMFER2_SIZE * 0.999621916911), (0, 0), align=None)
    extrude(amount=0.343145751, mode=Mode.SUBTRACT)
    with BuildSketch(Plane(origin=(0, 20.942640687, 2), x_dir=(0.02749587661058645, 0, -0.9996219169112966), z_dir=(0, 1, 0))) as chamfer2_piece_32:
        Polygon((CHAMFER2_SIZE * 0.999621916911, CHAMFER2_SIZE * 0.0274958766106), (-CHAMFER2_SIZE * 0.0274958766106, CHAMFER2_SIZE * 0.999621916911), (0, 0), align=None)
    extrude(amount=7.514718626, mode=Mode.SUBTRACT)
    with BuildSketch(Plane(origin=(0, 28.457359313, -1), x_dir=(0, 0.7071067811865557, 0.7071067811865395), z_dir=(0, 0.7071067811865395, -0.7071067811865557))) as chamfer2_piece_33:
        Polygon((3 - CHAMFER2_SIZE, 0), (3, -CHAMFER2_SIZE), (3, 0), align=None)
    revolve(axis=Axis((0, 28.457359313, -1), (1, 0, 0)), revolution_arc=45, mode=Mode.SUBTRACT)
    with BuildSketch(Plane(origin=(0, 20.942640687, -1), x_dir=(0, 0, 1), z_dir=(0, 1, 0))) as chamfer2_piece_34:
        Polygon((3 - CHAMFER2_SIZE, 0), (3, -CHAMFER2_SIZE), (3, 0), align=None)
    revolve(axis=Axis((0, 20.942640687, -1), (1, 0, 0)), revolution_arc=45, mode=Mode.SUBTRACT)
    with BuildSketch(Plane(origin=(0, 3, -3), x_dir=(0, 0, 1), z_dir=(0, 1, 0))) as chamfer2_piece_35:
        Polygon((3 - CHAMFER2_SIZE, 0), (3, -CHAMFER2_SIZE), (3, 0), align=None)
    revolve(axis=Axis((0, 3, -3), (1, 0, 0)), revolution_arc=90, mode=Mode.SUBTRACT)
    with BuildSketch(Plane(origin=(0, 16.457359313, 3), x_dir=(0, 0.707106781186557, -0.707106781186538), z_dir=(0, 0.707106781186538, 0.707106781186557))) as chamfer2_piece_36:
        Polygon((3 + CHAMFER2_SIZE, 0), (3, CHAMFER2_SIZE), (3, 0), align=None)
    revolve(axis=Axis((0, 16.457359313, 3), (-1, 0, 0)), revolution_arc=45, mode=Mode.SUBTRACT)
    with BuildSketch(Plane(origin=(0, 15.38, -10.491326805), x_dir=(0.027495876610586306, -0.9996219169112966, 0), z_dir=(0, 0, -1))) as chamfer2_piece_37a_section:
        Polygon((CHAMFER2_SIZE * 0.999621916911, CHAMFER2_SIZE * 0.0274958766106), (-CHAMFER2_SIZE * 0.0274958766106, CHAMFER2_SIZE * 0.999621916911), (0, 0), align=None)
    chamfer2_piece_37a = extrude(amount=13.178673195, mode=Mode.PRIVATE)
    chamfer2_piece_37a = split(chamfer2_piece_37a, bisect_by=Plane(origin=(-0.131917451, 15.248082549, -11.52), z_dir=(0, 0, 1)), keep=Keep.TOP, mode=Mode.PRIVATE)
    with BuildSketch(Plane(origin=(0, 16.53, -11.52), x_dir=(0.027495876610586306, 0, 0.9996219169112966), z_dir=(0, -1, 0))) as chamfer2_piece_37b_section:
        Polygon((CHAMFER2_SIZE * 0.999621916911, CHAMFER2_SIZE * 0.0274958766106), (-CHAMFER2_SIZE * 0.0274958766106, CHAMFER2_SIZE * 0.999621916911), (0, 0), align=None)
    chamfer2_piece_37b = extrude(amount=2.178673195, mode=Mode.PRIVATE)
    chamfer2_piece_37b = split(chamfer2_piece_37b, bisect_by=Plane(origin=(-0.131917451, 15.38, -11.388082549), z_dir=(0, -1, 0)), keep=Keep.TOP, mode=Mode.PRIVATE)
    chamfer2_piece_37 = chamfer2_piece_37a & chamfer2_piece_37b
    add(chamfer2_piece_37, mode=Mode.SUBTRACT)
    with BuildSketch(Plane(origin=(0, 17.558673195, -11.52), x_dir=(0.027495876610586306, 0, 0.9996219169112966), z_dir=(0, -1, 0))) as chamfer2_piece_38a_section:
        Polygon((CHAMFER2_SIZE * 0.999621916911, CHAMFER2_SIZE * 0.0274958766106), (-CHAMFER2_SIZE * 0.0274958766106, CHAMFER2_SIZE * 0.999621916911), (0, 0), align=None)
    chamfer2_piece_38a = extrude(amount=2.178673195, mode=Mode.PRIVATE)
    chamfer2_piece_38a = split(chamfer2_piece_38a, bisect_by=Plane(origin=(-0.131917451, 16.53, -11.388082549), z_dir=(0, 1, 0)), keep=Keep.TOP, mode=Mode.PRIVATE)
    with BuildSketch(Plane(origin=(0, 16.53, -23), x_dir=(0.027495876610586487, 0.9996219169112966, 0), z_dir=(0, 0, 1))) as chamfer2_piece_38b_section:
        Polygon((CHAMFER2_SIZE * 0.999621916911, CHAMFER2_SIZE * 0.0274958766106), (-CHAMFER2_SIZE * 0.0274958766106, CHAMFER2_SIZE * 0.999621916911), (0, 0), align=None)
    chamfer2_piece_38b = extrude(amount=12.508673195, mode=Mode.PRIVATE)
    chamfer2_piece_38b = split(chamfer2_piece_38b, bisect_by=Plane(origin=(-0.131917451, 16.661917451, -11.52), z_dir=(0, 0, 1)), keep=Keep.TOP, mode=Mode.PRIVATE)
    chamfer2_piece_38 = chamfer2_piece_38a & chamfer2_piece_38b
    add(chamfer2_piece_38, mode=Mode.SUBTRACT)


solid = part.part
